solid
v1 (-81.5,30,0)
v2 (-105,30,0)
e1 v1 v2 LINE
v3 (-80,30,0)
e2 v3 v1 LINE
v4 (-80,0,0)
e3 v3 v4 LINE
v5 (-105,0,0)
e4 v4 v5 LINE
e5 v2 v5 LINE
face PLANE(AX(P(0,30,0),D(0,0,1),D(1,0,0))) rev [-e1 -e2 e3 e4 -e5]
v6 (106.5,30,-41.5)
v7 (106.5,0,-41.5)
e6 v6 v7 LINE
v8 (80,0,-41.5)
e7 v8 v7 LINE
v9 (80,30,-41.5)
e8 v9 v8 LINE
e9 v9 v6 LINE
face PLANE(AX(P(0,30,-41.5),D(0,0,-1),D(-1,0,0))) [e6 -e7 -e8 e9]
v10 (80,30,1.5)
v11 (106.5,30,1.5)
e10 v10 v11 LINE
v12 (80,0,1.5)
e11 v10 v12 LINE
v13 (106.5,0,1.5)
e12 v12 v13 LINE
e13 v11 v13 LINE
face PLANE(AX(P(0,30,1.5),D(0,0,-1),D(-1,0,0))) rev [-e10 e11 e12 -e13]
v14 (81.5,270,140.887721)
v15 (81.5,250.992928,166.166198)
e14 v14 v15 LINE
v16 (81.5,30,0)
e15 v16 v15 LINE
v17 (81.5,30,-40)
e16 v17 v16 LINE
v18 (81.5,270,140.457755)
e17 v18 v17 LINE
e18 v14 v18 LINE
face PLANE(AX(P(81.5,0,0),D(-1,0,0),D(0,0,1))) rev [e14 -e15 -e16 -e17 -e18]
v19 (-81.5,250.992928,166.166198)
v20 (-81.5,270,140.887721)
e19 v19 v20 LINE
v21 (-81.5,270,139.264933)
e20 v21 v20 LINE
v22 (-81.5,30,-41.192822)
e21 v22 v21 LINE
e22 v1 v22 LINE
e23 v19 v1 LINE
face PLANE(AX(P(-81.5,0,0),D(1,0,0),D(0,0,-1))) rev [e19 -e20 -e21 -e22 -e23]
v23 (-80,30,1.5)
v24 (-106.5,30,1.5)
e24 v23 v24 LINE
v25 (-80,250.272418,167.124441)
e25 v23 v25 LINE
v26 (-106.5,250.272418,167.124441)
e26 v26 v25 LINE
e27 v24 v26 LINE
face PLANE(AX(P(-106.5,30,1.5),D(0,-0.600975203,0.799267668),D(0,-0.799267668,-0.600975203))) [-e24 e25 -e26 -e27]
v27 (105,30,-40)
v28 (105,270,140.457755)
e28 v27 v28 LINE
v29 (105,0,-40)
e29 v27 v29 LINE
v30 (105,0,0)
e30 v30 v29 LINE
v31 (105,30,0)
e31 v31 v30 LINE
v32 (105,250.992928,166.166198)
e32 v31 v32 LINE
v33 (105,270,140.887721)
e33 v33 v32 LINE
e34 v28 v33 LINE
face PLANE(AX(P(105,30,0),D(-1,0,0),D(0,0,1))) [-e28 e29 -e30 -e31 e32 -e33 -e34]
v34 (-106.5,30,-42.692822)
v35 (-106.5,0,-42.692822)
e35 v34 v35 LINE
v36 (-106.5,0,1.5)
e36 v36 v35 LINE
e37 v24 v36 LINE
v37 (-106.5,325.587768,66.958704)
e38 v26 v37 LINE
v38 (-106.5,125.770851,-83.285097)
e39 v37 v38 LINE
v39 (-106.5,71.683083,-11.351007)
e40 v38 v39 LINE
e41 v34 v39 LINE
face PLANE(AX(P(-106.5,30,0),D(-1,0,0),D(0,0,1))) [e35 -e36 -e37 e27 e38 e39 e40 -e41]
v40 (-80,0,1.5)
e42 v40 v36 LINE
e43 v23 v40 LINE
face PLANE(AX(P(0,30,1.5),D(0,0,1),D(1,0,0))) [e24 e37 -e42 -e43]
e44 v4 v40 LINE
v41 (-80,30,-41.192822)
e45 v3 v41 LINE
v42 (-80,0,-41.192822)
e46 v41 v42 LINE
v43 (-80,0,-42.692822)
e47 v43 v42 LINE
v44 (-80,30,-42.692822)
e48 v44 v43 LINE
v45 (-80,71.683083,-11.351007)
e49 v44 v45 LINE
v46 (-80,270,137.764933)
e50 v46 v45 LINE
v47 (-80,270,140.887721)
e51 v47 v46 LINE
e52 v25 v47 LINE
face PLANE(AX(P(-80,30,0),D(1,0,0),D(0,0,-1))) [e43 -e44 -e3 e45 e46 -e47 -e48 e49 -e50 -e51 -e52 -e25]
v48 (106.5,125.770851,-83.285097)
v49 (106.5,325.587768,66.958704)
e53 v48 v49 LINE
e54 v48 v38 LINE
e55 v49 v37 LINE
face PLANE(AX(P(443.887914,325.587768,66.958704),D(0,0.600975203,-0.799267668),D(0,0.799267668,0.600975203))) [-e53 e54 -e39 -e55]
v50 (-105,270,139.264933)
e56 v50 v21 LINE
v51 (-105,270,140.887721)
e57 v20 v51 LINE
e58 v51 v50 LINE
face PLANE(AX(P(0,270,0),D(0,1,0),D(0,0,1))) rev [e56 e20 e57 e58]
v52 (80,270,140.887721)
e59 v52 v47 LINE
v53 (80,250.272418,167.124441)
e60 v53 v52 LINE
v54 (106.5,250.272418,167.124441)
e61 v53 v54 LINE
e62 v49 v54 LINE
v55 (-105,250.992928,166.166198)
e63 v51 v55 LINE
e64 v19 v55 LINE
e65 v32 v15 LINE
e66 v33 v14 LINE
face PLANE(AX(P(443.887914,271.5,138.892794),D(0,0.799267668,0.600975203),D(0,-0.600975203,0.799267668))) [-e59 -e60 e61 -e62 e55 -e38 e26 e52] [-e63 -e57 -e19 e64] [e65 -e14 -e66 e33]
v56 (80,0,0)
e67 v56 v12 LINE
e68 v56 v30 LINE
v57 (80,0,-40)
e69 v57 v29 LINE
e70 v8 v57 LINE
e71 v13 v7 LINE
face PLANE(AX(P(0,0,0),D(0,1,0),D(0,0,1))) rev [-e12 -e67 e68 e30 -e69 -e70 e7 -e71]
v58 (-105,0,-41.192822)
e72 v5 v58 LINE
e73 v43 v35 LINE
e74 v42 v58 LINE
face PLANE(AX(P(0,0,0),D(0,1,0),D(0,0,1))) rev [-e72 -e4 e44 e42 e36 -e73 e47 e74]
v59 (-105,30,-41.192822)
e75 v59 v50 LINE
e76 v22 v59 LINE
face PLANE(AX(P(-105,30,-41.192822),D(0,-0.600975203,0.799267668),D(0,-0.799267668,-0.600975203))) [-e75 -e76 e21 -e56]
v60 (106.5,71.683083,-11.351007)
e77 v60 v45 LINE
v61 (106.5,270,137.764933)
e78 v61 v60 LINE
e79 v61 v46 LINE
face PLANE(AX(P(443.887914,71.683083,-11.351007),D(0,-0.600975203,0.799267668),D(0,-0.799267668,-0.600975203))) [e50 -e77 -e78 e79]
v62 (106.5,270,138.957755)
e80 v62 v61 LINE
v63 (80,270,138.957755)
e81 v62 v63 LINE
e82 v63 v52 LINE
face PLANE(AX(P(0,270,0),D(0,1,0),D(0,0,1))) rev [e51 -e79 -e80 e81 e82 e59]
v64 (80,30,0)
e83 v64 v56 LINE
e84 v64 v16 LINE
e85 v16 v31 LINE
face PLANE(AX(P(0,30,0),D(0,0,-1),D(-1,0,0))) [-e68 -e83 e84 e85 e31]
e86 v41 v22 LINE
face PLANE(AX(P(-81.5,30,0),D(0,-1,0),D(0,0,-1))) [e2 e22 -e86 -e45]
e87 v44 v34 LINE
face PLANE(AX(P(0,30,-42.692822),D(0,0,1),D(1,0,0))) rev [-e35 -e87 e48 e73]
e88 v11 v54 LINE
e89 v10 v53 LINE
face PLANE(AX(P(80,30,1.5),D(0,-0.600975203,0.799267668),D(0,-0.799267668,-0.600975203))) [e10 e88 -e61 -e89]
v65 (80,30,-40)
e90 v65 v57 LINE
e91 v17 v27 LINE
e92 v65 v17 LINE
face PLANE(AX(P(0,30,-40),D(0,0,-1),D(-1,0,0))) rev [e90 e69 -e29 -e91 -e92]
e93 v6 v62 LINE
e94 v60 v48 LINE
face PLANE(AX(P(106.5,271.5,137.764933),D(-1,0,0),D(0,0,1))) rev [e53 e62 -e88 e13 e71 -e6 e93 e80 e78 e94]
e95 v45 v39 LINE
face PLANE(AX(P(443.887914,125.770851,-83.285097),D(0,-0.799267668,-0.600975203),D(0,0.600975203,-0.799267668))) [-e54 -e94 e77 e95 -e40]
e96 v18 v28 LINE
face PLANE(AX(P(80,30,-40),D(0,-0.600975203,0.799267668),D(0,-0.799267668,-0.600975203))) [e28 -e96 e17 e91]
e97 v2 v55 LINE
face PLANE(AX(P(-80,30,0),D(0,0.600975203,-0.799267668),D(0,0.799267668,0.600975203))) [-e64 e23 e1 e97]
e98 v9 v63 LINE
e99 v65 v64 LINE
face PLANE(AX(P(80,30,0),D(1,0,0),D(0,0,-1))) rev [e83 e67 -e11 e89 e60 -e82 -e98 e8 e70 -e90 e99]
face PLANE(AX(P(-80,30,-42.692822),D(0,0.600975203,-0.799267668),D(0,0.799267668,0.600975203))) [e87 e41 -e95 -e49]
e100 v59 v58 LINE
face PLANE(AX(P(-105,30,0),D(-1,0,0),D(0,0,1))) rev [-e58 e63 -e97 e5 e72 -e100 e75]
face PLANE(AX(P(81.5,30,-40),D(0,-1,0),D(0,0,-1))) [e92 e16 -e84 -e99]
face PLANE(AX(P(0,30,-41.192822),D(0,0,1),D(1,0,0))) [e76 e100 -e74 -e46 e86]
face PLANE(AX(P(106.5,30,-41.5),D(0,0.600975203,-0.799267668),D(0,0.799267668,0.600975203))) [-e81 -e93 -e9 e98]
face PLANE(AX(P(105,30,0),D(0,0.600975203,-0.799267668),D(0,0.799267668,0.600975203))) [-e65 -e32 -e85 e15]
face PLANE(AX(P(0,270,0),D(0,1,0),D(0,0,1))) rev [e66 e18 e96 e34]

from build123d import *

# Parameters (mm, degrees)
BOSS_EXTRUDE1_DEPTH   = 30
BOSS_EXTRUDE1_2_DEPTH = 30
SWEEP1_START          = -106.5
SWEEP1_DEPTH          = 26.5
SWEEP1_2_DEPTH        = 1.5
SWEEP2_START          = 80
SWEEP2_DEPTH          = 26.5
SWEEP2_START_2        = 105
SWEEP2_2_DEPTH        = 1.5
BOSS_EXTRUDE2_DEPTH   = 1.5
BOSS_EXTRUDE3_DEPTH   = 1.5
SKETCH7_W             = 213
SKETCH7_H             = 44.192821834
BOSS_EXTRUDE4_DEPTH   = 1.5
BOSS_EXTRUDE5_REACH   = 392.115
SKETCH9_W             = 222.593563538
SKETCH9_H             = 76.90916357
CUT_EXTRUDE1_DEPTH    = 487.5


# Read off the part's stored shape, not the designer's step: Sweep1, Sweep2
with BuildPart() as part:
    # Sketch1 → Boss-Extrude1 (new body)
    with BuildSketch(Plane(origin=(0, 0, 0), x_dir=(1, 0, 0), z_dir=(0, 1, 0))):
        Polygon((-80, 0), (-80, -1.5), (-106.5, -1.5), (-106.5, 42.692821834), (-80, 42.692821834), (-80, 41.192821834), (-105, 41.192821834), (-105, 0), align=None)
    extrude(amount=BOSS_EXTRUDE1_DEPTH)

    # Sweep1 outline → Sweep1 (add)
    with BuildSketch(Plane.YZ.offset(SWEEP1_START)):
        Polygon((30, -42.692821834), (270, 137.764932896), (270, 139.264932896), (30, -41.192821834), align=None)
        Polygon((30, 0), (270, 180.45775473), (270, 181.95775473), (30, 1.5), align=None)
    extrude(amount=SWEEP1_DEPTH)

    # Sweep1 2 outline → Sweep1 2 (add)
    with BuildSketch(Plane.YZ.offset(SWEEP1_START)):
        Polygon((30, -41.192821834), (270, 139.264932896), (270, 180.45775473), (30, 0), align=None)
    extrude(amount=SWEEP1_2_DEPTH)

    # Sketch5 → Boss-Extrude2 (add)
    with BuildSketch(Plane(origin=(-80, 0, 0), x_dir=(0, 0, -1), z_dir=(1, 0, 0))):
        Polygon((0, 30), (-180.45775473, 270), (-139.264932896, 270), (41.192821834, 30), align=None)
    extrude(amount=-BOSS_EXTRUDE2_DEPTH)



with BuildPart() as body_2:
    # Sketch1 → Boss-Extrude1 2 (new body)
    with BuildSketch(Plane(origin=(0, 0, 0), x_dir=(1, 0, 0), z_dir=(0, 1, 0))):
        Polygon((80, 0), (105, 0), (105, 40), (80, 40), (80, 41.5), (106.5, 41.5), (106.5, -1.5), (80, -1.5), align=None)
    extrude(amount=BOSS_EXTRUDE1_2_DEPTH)

    # Sweep2 outline → Sweep2 (add)
    with BuildSketch(Plane.YZ.offset(SWEEP2_START)):
        Polygon((270, 180.45775473), (270, 181.95775473), (30, 1.5), (30, 0), align=None)
        Polygon((270, 138.95775473), (270, 140.45775473), (30, -40), (30, -41.5), align=None)
    extrude(amount=SWEEP2_DEPTH)

    # Sweep2 2 outline → Sweep2 2 (add)
    with BuildSketch(Plane.YZ.offset(SWEEP2_START_2)):
        Polygon((270, 140.45775473), (270, 180.45775473), (30, 0), (30, -40), align=None)
    extrude(amount=SWEEP2_2_DEPTH)

    # Sketch6 → Boss-Extrude3 (add)
    with BuildSketch(Plane.ZY.offset(-80)):
        Polygon((-40, 30), (140.45775473, 270), (180.45775473, 270), (0, 30), align=None)
    extrude(amount=-BOSS_EXTRUDE3_DEPTH)


with BuildPart() as part_1:
    add(part.part)

    add(body_2.part)  # Boss-Extrude4 merges body 2
    # Sketch7 → Boss-Extrude4 (add)
    with BuildSketch(Plane(origin=(0, 270, 0), x_dir=(1, 0, 0), z_dir=(0, 1, 0))):
        with Locations((0, -159.861343813)):
            Rectangle(SKETCH7_W, SKETCH7_H)
    extrude(amount=BOSS_EXTRUDE4_DEPTH)

    # Boss-Extrude5: up to this face of the body (flat: up to its plane)
    boss_extrude5_end = Plane(part_1.part.faces().sort_by_distance((106.5, 135.770686917, 60.769229512))[0])
    # Sketch8 → Boss-Extrude5 (add, up to the picked face)
    with BuildSketch(Plane.ZY.offset(106.5), mode=Mode.PRIVATE) as boss_extrude5_sk1:
        Polygon((-11.351006958, 71.683083011), (137.764932896, 270), (137.764932896, 271.5), (138.892793863, 271.5), (66.958703747, 325.587768295), (-83.285097074, 125.770851306), align=None)
    boss_extrude5_tool1 = split(extrude(boss_extrude5_sk1.sketch, amount=-BOSS_EXTRUDE5_REACH, mode=Mode.PRIVATE), bisect_by=boss_extrude5_end, keep=Keep.BOTH, mode=Mode.PRIVATE)
    add(boss_extrude5_tool1.solids().sort_by(Axis((-106.5, 198.632705, 27.7997), (1, 0, 0)))[0])

    # Sketch9 → Cut-Extrude1 (cut)
    with BuildSketch(Plane(origin=(0, 85.429976286, -113.617695949), x_dir=(-1, 0, 0), z_dir=(0, 0.6009752032818666, -0.7992676679563107))):
        with Locations((4.796781769, 338.926878661)):
            Rectangle(SKETCH9_W, SKETCH9_H)
    extrude(amount=-CUT_EXTRUDE1_DEPTH, mode=Mode.SUBTRACT)


solid = part_1.part
